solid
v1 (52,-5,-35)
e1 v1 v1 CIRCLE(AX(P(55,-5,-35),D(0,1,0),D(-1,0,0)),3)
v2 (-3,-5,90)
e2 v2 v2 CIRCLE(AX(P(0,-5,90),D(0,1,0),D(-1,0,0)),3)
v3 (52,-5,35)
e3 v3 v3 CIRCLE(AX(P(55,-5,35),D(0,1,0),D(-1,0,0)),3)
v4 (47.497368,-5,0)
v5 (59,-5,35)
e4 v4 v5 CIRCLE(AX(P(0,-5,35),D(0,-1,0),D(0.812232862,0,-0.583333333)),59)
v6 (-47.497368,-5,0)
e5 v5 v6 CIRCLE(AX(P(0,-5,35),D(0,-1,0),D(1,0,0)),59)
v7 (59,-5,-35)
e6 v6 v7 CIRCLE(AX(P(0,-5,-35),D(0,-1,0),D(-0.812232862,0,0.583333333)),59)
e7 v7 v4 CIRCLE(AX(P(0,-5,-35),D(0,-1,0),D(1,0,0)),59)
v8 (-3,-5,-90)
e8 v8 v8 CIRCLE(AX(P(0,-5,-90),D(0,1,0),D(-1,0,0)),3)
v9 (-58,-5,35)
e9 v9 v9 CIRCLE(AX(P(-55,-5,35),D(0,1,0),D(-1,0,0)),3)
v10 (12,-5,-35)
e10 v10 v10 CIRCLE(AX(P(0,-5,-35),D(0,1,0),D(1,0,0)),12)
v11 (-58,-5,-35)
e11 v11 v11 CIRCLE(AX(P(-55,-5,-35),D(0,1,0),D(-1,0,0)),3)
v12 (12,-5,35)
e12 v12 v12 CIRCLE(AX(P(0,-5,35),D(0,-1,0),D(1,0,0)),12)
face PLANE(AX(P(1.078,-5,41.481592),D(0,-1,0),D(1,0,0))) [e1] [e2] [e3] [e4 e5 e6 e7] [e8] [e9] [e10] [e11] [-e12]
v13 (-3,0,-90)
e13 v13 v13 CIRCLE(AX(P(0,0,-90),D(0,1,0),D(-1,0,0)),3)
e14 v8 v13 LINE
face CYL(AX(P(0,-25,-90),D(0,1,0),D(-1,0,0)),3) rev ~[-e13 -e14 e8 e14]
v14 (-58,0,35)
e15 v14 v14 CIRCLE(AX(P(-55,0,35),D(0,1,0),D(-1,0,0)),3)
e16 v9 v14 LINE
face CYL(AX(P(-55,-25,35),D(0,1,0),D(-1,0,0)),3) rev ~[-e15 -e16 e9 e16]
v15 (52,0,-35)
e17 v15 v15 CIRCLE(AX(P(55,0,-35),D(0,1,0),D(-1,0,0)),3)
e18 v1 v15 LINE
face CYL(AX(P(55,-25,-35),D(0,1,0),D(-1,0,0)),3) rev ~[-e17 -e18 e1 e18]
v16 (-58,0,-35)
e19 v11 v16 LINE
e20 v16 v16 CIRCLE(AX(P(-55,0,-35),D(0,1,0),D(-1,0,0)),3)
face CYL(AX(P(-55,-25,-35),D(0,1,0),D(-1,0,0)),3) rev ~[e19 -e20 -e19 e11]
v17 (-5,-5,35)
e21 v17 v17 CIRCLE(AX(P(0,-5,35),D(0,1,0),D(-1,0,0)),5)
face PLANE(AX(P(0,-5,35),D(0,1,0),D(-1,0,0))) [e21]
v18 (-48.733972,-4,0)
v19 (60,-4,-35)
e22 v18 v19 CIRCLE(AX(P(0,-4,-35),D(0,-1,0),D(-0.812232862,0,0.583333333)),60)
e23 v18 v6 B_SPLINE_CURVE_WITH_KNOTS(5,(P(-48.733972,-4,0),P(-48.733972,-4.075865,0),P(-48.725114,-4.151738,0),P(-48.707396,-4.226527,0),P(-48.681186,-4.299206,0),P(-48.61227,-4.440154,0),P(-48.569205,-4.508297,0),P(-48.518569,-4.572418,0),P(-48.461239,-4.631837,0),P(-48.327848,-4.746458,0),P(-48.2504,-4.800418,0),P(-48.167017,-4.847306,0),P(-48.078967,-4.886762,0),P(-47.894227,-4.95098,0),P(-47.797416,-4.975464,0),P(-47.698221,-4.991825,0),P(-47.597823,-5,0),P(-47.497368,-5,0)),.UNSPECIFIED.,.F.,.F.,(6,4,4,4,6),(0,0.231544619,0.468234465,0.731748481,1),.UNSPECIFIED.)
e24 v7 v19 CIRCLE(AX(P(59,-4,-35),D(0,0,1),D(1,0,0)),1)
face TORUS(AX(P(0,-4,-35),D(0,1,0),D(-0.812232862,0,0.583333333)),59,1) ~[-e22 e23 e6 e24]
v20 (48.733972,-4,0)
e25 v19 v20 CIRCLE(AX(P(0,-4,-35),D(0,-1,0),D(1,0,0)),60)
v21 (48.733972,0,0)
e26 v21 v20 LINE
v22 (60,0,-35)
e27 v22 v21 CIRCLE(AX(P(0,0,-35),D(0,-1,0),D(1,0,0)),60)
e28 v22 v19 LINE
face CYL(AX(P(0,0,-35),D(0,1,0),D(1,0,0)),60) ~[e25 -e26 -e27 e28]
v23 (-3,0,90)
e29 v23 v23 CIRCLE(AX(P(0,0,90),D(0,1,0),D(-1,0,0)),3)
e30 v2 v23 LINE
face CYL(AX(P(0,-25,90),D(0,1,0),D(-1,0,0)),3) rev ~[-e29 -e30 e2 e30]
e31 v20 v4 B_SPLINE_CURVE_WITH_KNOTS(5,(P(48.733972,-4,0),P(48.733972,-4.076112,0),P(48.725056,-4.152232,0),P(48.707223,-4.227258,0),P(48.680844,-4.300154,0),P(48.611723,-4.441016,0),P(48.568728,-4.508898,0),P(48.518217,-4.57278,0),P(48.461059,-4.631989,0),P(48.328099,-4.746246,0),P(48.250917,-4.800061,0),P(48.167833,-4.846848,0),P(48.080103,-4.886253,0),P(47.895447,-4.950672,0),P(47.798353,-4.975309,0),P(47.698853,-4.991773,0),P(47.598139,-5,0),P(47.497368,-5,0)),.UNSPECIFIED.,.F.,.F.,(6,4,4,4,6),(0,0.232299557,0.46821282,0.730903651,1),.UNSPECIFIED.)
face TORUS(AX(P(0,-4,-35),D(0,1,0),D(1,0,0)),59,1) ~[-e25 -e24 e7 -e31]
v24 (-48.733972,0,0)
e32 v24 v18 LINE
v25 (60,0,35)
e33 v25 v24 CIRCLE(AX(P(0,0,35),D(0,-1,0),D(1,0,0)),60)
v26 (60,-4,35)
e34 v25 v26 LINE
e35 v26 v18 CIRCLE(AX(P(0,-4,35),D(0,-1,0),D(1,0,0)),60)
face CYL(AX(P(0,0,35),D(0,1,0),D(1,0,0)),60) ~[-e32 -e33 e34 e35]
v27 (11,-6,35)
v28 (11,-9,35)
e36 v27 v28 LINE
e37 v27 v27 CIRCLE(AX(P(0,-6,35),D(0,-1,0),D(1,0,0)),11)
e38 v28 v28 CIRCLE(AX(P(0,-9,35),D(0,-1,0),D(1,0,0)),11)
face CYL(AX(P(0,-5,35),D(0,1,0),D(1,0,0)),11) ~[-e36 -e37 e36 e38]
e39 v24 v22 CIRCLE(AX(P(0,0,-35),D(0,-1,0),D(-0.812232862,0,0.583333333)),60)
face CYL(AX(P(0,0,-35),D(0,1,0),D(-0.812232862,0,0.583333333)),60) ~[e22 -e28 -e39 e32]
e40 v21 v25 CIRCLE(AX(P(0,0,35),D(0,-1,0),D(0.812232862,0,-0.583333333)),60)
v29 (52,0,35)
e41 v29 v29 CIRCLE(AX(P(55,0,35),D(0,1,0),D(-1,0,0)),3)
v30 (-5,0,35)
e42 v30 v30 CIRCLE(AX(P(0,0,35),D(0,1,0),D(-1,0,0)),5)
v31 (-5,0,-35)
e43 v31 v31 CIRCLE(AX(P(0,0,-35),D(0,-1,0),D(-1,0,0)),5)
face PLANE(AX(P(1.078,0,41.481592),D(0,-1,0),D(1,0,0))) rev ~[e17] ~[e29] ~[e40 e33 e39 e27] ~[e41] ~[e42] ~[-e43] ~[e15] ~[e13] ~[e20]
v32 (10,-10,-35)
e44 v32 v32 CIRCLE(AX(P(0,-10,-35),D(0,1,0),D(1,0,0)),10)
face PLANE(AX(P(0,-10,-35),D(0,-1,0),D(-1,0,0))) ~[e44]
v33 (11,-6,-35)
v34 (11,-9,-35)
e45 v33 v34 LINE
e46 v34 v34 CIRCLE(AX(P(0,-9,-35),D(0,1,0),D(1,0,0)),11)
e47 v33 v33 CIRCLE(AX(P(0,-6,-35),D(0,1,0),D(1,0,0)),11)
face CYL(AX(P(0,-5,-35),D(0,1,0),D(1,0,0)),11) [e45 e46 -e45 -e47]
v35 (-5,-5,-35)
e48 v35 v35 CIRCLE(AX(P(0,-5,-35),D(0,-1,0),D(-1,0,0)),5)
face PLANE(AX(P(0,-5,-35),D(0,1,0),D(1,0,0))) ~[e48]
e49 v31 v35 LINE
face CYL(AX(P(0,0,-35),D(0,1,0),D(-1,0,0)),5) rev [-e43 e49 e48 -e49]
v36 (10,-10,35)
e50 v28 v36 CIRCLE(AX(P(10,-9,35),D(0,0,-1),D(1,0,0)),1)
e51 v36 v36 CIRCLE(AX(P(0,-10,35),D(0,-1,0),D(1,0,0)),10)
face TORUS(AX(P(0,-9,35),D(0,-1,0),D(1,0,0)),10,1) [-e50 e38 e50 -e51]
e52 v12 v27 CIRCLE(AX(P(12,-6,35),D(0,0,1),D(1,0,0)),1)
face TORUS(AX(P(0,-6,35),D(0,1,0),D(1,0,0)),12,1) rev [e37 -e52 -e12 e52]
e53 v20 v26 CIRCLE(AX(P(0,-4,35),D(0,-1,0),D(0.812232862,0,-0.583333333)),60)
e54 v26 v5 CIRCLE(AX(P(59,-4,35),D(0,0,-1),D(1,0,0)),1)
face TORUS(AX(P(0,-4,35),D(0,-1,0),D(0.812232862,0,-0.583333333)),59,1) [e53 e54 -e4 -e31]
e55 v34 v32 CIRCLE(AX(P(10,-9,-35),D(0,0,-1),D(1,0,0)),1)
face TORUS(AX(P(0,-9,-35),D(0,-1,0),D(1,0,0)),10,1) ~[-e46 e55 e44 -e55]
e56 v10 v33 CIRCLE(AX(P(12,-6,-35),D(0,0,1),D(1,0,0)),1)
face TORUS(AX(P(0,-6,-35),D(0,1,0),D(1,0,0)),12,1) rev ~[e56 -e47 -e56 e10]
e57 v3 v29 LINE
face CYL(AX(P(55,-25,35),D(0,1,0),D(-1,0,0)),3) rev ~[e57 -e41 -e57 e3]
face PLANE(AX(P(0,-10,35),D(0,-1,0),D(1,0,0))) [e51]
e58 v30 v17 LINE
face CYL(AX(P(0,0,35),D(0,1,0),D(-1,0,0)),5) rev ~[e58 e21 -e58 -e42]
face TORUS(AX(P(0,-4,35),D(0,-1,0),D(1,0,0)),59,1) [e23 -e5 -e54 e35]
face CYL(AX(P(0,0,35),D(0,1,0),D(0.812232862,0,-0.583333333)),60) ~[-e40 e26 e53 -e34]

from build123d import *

# Parameters (mm, degrees)
F1_DEPTH = 5
F2_R     = 11
F3_DEPTH = 5
F4_R     = 5
F5_DEPTH = 5
F6_R     = 1
F8_D     = 6
F8_DEPTH = 20
F8_TIP   = 1.8025818571


# Not quite as in the source:
# - a pattern or mirror of a feature is missing from the dataset's text; its kind, count and spacing are read off the source's solid


with BuildPart() as f1:
    # F0 (on Front) → F1 (new body)
    with BuildSketch(Plane.XZ):
        with BuildLine():
            ThreePointArc((48.733971724, 0), (57.1140889074, 16.6157445547), (60, 35))
            ThreePointArc((60, 35), (-18.3842554453, 92.1140889074), (-48.733971724, 0))
            ThreePointArc((-48.733971724, 0), (0, 25), (48.733971724, 0))
        make_face()
        with BuildLine():
            ThreePointArc((48.733971724, 0), (0, 25), (-48.733971724, 0))
            ThreePointArc((-48.733971724, 0), (0, -25), (48.733971724, 0))
        make_face()
        with BuildLine():
            ThreePointArc((48.733971724, 0), (0, -25), (-48.733971724, 0))
            ThreePointArc((-48.733971724, 0), (-18.3842554453, -92.1140889074), (60, -35))
            ThreePointArc((60, -35), (57.1140889074, -16.6157445547), (48.733971724, 0))
        make_face()
    extrude(amount=F1_DEPTH)

    # F2 (on face) → F3 (join)
    with BuildSketch(Plane.XZ.offset(5)):
        with Locations((0, 35)):
            Circle(F2_R)
    f3 = extrude(amount=F3_DEPTH)

    # F3_copies: F3 across plane
    add(f3.mirror(Plane(origin=(0, 0, 0), x_dir=(-1, 0, 0), z_dir=(0, 0, -1))))

    # F4 (on face) → F5 (cut)
    with BuildSketch(Plane(origin=(0, 0, 0), x_dir=(-1, 0, 0), z_dir=(0, 1, 0))):
        with Locations((0, 35)):
            Circle(F4_R)
    f5 = extrude(amount=-F5_DEPTH, mode=Mode.SUBTRACT)

    # F5_copies: F5 across plane
    add(f5.mirror(Plane(origin=(0, 0, 0), x_dir=(-1, 0, 0), z_dir=(0, 0, -1))), mode=Mode.SUBTRACT)

    # F6
    f6_edges = [f1.edges().sort_by_distance(p)[0] for p in [
        (-11, -10, 35),
        (-11, -5, 35),
        (0, -5, 95),
        (0, -5, -95),
        (-11, -5, -35),
        (-11, -10, -35),
    ]]
    fillet(f6_edges, radius=F6_R)

    # F8
    with Locations(Plane.XZ.offset(5)):
        with Locations((0, 90), (-55, 35), (-55, -35), (0, -90), (55, -35), (55, 35)):
            Hole(F8_D / 2, depth=F8_DEPTH)
            with Locations((0, 0, -(F8_DEPTH + F8_TIP / 2))):  # 118° drill point
                Cone(0, F8_D / 2, F8_TIP, mode=Mode.SUBTRACT)


solid = f1.part
